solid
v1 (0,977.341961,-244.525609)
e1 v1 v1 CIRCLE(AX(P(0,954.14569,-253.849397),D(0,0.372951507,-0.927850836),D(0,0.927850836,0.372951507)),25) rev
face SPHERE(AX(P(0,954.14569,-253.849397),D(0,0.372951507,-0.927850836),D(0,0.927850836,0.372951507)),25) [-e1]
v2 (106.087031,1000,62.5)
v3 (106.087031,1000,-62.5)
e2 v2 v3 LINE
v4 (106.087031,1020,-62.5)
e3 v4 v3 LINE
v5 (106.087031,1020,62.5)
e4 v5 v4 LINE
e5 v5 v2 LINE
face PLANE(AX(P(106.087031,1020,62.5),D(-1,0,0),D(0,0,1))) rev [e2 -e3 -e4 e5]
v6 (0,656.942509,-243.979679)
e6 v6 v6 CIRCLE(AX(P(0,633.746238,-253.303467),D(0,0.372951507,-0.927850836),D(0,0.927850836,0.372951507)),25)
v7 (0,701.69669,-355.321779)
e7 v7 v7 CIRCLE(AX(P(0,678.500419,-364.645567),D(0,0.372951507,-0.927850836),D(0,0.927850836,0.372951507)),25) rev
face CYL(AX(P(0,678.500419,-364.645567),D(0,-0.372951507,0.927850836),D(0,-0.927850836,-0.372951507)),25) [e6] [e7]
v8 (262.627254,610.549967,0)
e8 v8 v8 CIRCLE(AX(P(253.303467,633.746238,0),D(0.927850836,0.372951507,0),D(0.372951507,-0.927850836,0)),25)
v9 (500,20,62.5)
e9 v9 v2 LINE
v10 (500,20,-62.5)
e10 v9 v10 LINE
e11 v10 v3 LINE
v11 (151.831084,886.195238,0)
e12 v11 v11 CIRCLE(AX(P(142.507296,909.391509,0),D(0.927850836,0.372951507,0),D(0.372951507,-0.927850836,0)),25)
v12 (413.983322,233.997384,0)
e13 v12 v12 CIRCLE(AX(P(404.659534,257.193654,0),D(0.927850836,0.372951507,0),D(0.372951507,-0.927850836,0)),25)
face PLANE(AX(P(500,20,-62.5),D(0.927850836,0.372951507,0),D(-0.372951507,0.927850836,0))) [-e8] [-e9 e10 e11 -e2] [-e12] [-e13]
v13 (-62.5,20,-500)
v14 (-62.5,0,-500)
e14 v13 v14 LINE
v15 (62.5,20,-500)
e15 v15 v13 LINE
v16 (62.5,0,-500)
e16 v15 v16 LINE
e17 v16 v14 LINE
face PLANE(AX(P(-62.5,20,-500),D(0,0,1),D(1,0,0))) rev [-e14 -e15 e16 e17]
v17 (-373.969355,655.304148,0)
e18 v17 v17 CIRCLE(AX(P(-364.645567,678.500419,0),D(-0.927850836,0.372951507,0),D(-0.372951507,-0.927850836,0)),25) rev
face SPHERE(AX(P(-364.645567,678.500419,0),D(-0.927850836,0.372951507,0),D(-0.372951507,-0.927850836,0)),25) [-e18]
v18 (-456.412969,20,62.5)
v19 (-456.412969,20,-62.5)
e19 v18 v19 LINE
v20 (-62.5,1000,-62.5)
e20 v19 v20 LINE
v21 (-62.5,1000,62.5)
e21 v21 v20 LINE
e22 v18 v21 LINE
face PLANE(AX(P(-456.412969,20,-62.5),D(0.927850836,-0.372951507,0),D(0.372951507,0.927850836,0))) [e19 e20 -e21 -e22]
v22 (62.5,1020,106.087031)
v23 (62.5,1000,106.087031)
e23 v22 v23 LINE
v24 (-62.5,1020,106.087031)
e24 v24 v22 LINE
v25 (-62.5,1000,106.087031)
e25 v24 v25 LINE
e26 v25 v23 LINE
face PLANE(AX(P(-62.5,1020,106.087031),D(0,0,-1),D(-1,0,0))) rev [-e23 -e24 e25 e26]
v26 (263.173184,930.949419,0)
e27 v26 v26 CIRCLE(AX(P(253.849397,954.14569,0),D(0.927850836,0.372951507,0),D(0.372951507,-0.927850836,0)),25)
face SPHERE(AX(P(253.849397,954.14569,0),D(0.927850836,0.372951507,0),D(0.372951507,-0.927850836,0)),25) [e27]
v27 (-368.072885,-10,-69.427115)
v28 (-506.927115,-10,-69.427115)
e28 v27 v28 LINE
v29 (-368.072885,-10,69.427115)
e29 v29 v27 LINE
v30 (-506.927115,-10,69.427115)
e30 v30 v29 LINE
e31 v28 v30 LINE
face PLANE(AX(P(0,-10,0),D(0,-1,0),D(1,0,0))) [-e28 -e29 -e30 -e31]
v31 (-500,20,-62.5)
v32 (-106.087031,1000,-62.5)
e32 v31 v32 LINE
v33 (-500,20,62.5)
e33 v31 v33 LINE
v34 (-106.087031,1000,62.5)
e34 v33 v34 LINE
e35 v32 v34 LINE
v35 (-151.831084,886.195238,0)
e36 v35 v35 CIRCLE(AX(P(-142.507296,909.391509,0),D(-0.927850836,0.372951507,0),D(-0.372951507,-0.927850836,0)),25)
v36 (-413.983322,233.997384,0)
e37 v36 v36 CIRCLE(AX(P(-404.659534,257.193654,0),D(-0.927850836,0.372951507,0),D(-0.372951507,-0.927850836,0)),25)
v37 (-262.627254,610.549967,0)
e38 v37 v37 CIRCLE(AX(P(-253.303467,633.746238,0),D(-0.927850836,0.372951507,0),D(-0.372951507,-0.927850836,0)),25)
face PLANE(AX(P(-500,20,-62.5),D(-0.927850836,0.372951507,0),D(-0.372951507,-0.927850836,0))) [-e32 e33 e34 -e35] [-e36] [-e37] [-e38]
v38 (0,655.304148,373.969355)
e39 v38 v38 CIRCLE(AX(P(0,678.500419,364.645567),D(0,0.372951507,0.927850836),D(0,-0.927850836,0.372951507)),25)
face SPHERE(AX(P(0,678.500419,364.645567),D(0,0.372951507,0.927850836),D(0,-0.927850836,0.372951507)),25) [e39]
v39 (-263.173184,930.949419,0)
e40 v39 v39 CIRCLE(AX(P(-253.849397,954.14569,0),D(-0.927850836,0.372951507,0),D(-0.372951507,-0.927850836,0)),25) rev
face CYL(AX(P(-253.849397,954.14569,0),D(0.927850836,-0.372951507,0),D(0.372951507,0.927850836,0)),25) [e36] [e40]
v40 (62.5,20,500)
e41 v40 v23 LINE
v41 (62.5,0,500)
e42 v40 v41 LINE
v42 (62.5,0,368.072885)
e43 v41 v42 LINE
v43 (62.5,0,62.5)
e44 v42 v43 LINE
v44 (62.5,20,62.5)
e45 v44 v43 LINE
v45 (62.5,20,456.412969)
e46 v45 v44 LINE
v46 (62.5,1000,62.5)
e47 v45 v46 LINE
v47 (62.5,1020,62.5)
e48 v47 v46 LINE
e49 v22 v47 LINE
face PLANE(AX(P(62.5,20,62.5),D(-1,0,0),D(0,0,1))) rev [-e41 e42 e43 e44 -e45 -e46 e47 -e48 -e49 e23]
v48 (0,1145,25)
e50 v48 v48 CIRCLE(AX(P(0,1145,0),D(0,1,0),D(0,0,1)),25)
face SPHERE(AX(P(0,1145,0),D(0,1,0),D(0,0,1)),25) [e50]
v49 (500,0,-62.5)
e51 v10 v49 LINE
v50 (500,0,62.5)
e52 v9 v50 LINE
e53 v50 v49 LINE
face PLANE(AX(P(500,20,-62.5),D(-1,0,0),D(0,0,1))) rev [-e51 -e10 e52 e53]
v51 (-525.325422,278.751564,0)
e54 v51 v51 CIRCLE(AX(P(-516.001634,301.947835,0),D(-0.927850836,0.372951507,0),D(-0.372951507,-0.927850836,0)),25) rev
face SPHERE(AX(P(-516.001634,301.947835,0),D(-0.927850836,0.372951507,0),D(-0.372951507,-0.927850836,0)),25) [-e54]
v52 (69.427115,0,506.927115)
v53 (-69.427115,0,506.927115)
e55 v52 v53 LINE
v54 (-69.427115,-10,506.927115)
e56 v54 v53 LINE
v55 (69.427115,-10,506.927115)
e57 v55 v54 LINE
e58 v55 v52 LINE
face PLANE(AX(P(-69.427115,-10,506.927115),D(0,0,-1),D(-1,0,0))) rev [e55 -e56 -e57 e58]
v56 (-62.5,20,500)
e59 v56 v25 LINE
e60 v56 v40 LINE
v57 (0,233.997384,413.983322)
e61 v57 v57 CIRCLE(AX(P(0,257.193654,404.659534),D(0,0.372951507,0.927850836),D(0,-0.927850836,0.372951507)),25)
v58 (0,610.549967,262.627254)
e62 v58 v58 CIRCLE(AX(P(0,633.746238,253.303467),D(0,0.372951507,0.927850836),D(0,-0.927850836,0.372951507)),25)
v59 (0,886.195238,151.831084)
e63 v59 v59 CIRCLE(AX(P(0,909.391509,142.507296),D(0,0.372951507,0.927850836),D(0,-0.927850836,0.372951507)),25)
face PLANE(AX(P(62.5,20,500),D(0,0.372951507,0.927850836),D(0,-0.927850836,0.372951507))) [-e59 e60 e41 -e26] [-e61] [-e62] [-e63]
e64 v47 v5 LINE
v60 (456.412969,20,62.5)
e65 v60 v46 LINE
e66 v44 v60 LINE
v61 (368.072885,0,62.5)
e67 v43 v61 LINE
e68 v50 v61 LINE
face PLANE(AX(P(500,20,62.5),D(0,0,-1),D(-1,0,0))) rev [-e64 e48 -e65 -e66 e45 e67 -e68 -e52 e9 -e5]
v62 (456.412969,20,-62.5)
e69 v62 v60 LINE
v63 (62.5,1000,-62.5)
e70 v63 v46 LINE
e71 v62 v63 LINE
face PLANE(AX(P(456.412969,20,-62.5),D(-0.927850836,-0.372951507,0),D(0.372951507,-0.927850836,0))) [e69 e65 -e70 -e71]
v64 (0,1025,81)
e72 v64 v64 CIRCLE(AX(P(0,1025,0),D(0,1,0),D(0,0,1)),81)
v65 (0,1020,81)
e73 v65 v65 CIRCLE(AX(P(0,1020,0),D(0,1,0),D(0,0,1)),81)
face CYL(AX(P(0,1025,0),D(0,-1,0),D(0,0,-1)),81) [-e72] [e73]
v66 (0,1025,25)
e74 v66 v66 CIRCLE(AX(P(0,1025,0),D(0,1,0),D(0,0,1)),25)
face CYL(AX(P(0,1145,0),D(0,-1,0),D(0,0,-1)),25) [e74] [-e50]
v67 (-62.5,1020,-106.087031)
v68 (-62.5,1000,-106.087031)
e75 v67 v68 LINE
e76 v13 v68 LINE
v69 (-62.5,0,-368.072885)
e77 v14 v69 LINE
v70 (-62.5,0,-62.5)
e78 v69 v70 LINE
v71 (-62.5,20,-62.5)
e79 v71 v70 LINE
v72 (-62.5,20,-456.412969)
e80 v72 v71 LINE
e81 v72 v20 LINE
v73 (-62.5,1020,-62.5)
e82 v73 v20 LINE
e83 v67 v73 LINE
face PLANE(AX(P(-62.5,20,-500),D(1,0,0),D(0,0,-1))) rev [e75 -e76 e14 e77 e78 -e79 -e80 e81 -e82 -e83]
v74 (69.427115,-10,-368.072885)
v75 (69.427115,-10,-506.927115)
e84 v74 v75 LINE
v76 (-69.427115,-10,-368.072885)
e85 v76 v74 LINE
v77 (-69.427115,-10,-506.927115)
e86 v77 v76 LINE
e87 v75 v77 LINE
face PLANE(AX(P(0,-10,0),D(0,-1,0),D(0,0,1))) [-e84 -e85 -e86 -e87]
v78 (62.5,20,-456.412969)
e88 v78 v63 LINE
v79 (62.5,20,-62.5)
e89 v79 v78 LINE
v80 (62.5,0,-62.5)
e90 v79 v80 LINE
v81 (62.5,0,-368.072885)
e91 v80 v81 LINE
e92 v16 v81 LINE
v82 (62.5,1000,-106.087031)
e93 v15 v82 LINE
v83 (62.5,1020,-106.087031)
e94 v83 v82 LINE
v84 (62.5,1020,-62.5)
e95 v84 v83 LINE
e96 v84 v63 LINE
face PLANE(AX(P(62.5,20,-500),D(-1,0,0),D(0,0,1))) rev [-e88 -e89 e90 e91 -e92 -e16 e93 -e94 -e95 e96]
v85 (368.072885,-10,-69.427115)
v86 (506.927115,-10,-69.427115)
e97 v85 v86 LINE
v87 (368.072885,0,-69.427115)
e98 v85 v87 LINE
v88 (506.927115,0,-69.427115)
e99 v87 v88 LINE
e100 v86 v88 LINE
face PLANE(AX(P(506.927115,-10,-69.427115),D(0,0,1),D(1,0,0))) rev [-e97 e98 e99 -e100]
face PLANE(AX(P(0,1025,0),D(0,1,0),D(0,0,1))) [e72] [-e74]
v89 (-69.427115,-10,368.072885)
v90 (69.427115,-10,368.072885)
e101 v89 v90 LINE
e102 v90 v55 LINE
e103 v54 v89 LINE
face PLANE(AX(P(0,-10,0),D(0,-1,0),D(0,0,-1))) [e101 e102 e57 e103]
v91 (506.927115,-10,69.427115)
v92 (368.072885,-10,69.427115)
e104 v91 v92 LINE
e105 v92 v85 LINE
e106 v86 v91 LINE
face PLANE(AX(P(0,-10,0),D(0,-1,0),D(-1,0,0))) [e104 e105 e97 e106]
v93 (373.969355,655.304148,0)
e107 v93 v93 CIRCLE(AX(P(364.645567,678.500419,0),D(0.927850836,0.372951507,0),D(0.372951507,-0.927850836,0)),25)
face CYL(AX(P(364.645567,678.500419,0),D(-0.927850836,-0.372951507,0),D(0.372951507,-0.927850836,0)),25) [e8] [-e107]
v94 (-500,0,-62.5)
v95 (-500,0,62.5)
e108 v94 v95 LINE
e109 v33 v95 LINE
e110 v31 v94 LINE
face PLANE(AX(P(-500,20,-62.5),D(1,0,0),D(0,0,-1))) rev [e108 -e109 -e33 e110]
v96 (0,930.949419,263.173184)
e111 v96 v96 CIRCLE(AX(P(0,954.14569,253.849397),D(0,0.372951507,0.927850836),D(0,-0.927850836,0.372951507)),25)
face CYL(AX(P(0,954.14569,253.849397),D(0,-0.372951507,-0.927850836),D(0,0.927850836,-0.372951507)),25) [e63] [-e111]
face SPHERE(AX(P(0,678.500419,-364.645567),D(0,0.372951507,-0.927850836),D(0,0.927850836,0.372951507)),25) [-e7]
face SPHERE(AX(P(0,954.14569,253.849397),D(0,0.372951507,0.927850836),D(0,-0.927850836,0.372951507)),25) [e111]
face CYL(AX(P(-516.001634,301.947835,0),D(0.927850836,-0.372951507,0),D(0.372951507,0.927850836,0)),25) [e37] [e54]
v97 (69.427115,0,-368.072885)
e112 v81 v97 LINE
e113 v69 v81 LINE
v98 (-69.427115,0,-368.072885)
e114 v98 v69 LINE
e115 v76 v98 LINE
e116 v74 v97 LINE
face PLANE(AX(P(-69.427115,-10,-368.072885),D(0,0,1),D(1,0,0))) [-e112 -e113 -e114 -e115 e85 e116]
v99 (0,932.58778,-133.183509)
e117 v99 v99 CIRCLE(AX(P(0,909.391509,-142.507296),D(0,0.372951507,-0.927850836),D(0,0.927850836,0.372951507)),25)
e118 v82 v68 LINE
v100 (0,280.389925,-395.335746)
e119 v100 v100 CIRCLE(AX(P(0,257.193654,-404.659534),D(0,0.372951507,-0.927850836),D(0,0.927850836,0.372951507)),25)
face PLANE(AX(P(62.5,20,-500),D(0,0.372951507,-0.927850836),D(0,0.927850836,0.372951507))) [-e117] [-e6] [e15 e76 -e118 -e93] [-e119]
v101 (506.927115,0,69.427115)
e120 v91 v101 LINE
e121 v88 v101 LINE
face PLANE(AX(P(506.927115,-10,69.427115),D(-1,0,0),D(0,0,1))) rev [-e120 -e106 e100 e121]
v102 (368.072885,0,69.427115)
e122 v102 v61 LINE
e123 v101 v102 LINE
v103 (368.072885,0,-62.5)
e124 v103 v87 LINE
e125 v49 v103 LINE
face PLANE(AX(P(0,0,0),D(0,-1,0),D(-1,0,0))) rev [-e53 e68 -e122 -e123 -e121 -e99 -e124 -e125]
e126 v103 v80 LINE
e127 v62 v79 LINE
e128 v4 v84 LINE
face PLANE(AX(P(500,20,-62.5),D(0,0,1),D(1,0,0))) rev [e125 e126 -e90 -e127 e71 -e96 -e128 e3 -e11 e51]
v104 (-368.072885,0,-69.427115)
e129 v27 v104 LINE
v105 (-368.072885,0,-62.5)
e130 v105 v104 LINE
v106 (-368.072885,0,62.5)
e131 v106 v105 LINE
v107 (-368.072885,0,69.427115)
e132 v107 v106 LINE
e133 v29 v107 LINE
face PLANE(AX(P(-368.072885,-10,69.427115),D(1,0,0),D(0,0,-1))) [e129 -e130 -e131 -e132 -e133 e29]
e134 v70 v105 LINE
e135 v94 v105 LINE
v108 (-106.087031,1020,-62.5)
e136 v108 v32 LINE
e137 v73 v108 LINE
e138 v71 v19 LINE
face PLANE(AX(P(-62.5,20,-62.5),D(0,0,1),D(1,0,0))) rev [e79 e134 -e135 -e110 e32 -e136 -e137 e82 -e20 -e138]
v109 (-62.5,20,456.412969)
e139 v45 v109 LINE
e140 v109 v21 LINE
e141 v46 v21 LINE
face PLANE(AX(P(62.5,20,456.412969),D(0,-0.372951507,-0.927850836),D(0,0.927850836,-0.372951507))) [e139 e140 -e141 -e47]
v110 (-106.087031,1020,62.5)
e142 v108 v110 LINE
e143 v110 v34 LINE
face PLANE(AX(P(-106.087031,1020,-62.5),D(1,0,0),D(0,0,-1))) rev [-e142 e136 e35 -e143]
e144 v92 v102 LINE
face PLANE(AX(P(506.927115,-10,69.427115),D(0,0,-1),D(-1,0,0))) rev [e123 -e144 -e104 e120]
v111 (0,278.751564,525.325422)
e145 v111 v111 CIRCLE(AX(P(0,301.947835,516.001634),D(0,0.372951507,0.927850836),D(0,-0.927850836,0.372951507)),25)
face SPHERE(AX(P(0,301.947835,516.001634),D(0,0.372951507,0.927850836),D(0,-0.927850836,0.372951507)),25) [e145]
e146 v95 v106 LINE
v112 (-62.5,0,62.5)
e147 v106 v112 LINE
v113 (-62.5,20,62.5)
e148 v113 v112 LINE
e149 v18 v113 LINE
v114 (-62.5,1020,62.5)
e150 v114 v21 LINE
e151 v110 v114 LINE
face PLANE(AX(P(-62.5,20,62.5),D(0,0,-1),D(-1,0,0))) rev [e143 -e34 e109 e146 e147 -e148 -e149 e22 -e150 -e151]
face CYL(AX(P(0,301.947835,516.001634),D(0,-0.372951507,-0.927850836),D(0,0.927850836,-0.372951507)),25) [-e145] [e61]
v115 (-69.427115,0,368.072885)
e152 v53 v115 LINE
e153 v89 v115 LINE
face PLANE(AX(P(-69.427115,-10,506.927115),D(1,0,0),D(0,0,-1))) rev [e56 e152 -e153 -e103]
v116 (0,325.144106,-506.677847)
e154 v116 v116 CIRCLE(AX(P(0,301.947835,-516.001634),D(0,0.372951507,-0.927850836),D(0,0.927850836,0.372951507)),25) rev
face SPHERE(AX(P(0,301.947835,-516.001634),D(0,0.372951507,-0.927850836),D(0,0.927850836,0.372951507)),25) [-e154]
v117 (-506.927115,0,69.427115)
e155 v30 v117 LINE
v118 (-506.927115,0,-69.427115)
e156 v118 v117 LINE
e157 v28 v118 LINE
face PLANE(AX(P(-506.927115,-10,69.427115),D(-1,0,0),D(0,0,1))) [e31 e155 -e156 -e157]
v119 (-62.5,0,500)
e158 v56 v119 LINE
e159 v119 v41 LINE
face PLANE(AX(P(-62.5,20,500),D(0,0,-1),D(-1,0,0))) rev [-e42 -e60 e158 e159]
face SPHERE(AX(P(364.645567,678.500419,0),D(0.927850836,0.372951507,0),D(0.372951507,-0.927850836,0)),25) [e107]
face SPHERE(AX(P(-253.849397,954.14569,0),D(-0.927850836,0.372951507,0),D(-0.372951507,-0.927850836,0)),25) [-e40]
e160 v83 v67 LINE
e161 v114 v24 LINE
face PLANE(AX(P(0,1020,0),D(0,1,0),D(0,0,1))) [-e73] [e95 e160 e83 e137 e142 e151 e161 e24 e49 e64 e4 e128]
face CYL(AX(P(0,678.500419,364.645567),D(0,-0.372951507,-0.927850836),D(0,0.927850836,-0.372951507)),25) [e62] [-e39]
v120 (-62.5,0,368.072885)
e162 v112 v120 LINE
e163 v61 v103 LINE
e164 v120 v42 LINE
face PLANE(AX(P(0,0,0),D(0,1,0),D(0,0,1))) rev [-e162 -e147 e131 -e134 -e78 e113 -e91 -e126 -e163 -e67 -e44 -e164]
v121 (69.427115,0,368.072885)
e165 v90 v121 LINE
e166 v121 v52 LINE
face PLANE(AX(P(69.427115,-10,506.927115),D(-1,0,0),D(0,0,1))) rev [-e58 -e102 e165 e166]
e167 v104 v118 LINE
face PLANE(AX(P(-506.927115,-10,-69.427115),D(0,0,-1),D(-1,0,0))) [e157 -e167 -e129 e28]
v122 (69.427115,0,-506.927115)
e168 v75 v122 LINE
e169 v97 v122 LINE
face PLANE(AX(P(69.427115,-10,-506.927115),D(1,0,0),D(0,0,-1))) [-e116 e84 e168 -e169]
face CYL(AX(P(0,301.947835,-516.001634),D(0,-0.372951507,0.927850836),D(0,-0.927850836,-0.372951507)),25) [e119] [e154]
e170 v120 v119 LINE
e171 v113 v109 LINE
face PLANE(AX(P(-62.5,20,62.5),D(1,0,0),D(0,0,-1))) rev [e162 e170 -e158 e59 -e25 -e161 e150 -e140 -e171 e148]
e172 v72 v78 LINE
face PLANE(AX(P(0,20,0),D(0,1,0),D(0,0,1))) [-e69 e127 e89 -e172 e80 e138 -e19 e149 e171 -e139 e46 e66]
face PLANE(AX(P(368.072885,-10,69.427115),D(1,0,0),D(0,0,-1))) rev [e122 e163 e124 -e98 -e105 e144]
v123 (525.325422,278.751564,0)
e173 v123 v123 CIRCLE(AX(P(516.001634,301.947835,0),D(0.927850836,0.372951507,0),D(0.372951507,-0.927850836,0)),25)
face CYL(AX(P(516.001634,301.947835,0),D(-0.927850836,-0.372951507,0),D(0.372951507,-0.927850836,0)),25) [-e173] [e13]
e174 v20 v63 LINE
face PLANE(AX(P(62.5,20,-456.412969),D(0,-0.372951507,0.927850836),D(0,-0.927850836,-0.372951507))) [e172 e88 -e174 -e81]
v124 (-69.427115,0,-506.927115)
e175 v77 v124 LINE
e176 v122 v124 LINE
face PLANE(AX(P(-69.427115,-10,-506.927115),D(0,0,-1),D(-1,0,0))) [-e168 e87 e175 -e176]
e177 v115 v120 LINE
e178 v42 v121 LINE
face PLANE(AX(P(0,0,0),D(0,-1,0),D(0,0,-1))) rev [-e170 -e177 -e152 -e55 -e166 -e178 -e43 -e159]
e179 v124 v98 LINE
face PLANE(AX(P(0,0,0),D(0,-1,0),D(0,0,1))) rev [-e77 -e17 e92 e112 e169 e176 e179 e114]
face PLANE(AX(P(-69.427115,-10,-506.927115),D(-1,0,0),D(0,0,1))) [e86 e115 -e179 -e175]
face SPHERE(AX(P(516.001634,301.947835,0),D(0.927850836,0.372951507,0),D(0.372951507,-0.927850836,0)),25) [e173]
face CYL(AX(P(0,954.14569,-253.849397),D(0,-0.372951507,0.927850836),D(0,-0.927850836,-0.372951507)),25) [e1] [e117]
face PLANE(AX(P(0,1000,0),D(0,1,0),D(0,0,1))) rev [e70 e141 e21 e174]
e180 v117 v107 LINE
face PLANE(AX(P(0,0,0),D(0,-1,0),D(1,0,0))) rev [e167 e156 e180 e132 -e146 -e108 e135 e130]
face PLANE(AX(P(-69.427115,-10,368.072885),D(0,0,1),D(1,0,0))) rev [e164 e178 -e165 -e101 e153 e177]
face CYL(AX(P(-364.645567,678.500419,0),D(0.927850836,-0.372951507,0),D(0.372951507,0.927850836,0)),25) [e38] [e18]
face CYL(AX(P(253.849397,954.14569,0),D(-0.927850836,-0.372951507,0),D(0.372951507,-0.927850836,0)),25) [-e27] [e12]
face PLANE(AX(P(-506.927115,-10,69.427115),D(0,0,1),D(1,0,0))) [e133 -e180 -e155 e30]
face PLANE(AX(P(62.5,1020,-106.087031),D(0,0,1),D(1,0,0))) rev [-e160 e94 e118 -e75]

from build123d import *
from build123d.topology import SkipClean

# Parameters (mm, degrees)
BOSS_EXTRUDE1_DEPTH     = 20
BOSS_EXTRUDE2_DEPTH     = 20
SKETCH4_W               = 43.587031298
SKETCH4_H               = 125
MIRROR3_COPY_1_SKETCH_W = 43.587031298
MIRROR3_COPY_1_SKETCH_H = 125
MIRROR3_COPY_2_SKETCH_W = 43.587031298
MIRROR3_COPY_2_SKETCH_H = 125
SKETCH8_R               = 25
BOSS_EXTRUDE3_DEPTH     = 120
SKETCH11_W              = 138.854230546
SKETCH11_H              = 138.854230546
BOSS_EXTRUDE4_DEPTH     = 10
SKETCH12_R              = 81
BOSS_EXTRUDE5_DEPTH     = 5
SKETCH13_R              = 25
BOSS_EXTRUDE6_DEPTH     = 120
MIRROR6_COPY_1_SKETCH_R = 25
MIRROR6_COPY_1_DEPTH    = 120
MIRROR6_COPY_4_SKETCH_W = 138.854230546
MIRROR6_COPY_4_SKETCH_H = 138.854230546
MIRROR6_COPY_4_DEPTH    = 10
MIRROR6_COPY_6_SKETCH_R = 25
MIRROR6_COPY_6_DEPTH    = 120
MIRROR6_COPY_9_SKETCH_W = 138.854230546
MIRROR6_COPY_9_SKETCH_H = 138.854230546
MIRROR6_COPY_9_DEPTH    = 10


with BuildPart() as part:
    # Sketch1 → Boss-Extrude1 (new body)
    with BuildSketch(Plane(origin=(0, 0, 0), x_dir=(1, 0, 0), z_dir=(0, 1, 0))):
        Polygon((500, 62.5), (62.5, 62.5), (62.5, 500), (-62.5, 500), (-62.5, 62.5), (-500, 62.5), (-500, -62.5), (-62.5, -62.5), (-62.5, -500), (62.5, -500), (62.5, -62.5), (500, -62.5), align=None)
    extrude(amount=BOSS_EXTRUDE1_DEPTH)



with BuildPart() as body_2:
    # Sketch2 → Boss-Extrude2 (new body)
    with BuildSketch(Plane(origin=(0, 1000, 0), x_dir=(1, 0, 0), z_dir=(0, 1, 0))):
        Polygon((-62.5, 106.087031298), (-62.5, 62.5), (-106.087031298, 62.5), (-106.087031298, -62.5), (-62.5, -62.5), (-62.5, -106.087031298), (62.5, -106.087031298), (62.5, -62.5), (106.087031298, -62.5), (106.087031298, 62.5), (62.5, 62.5), (62.5, 106.087031298), align=None)
    extrude(amount=BOSS_EXTRUDE2_DEPTH)


with BuildPart() as part_1:
    add(part.part)

    add(body_2.part)  # Sweep1 merges body 2
    # Sweep1: sweep along a path in Sketch5
    with BuildLine(Plane.XY) as sweep1_path:
        Line((-478.206484351, 20), (-84.293515649, 1000))
    # Sketch4 → Sweep1 (sweep)
    with BuildSketch(Plane(origin=(0, 1000, 0), x_dir=(1, 0, 0), z_dir=(0, 1, 0))):
        with Locations((-84.293515649, 0)):
            Rectangle(SKETCH4_W, SKETCH4_H)
    sweep1 = sweep(path=sweep1_path.line)

    # Mirror1: Sweep1 across plane
    add(sweep1.mirror(Plane(origin=(0, 0, 0), x_dir=(0, 0, 1), z_dir=(1, 0, 0))))

    # Mirror2: Sweep1 across plane
    add(sweep1.mirror(Plane(origin=(0, 0, 0), x_dir=(-0.7071067811865477, 0, 0.7071067811865474), z_dir=(-0.7071067811865476, 0, -0.7071067811865476))))

    # Mirror3 copy 1: sweep along a path in Mirror3 copy 1 path
    with BuildLine(Plane.ZY) as mirror3_copy_1_path:
        Line((-478.206484351, 20), (-84.293515649, 1000))
    # Mirror3 copy 1 sketch → Mirror3 copy 1 (sweep)
    with BuildSketch(Plane.ZX.offset(1000)):
        with Locations((-84.293515649, 0)):
            Rectangle(MIRROR3_COPY_1_SKETCH_W, MIRROR3_COPY_1_SKETCH_H)
    sweep(path=mirror3_copy_1_path.line)

    # Mirror3 copy 2: sweep along a path in Mirror3 copy 2 path
    with BuildLine(Plane(origin=(0, 0, 0), x_dir=(1, 0, 0), z_dir=(0, 0, -1))) as mirror3_copy_2_path:
        Line((-478.206484351, -20), (-84.293515649, -1000))
    # Mirror3 copy 2 sketch → Mirror3 copy 2 (sweep)
    with BuildSketch(Plane(origin=(0, 1000, 0), x_dir=(1, 0, 0), z_dir=(0, 1, 0))):
        with Locations((-84.293515649, 0)):
            Rectangle(MIRROR3_COPY_2_SKETCH_W, MIRROR3_COPY_2_SKETCH_H)
    sweep(path=mirror3_copy_2_path.line)

    # Sketch8 → Boss-Extrude3 (add)
    with BuildSketch(Plane(origin=(0, 175.803540397, 437.374453947), x_dir=(1, 0, 0), z_dir=(0, 0.3729515073235979, 0.9278508356331078))):
        with Locations((0, 493.552067167)):
            Circle(SKETCH8_R)
        with Locations((0, 87.718964011)):
            Circle(SKETCH8_R)
        with Locations((0, 790.631360439)):
            Circle(SKETCH8_R)
    boss_extrude3 = extrude(amount=BOSS_EXTRUDE3_DEPTH)

    # Sketch9 → Revolve1 (revolve)
    with BuildSketch(Plane(origin=(0, 220.557721276, 548.716554223), x_dir=(1, 0, 0), z_dir=(0, 0.372951507323598, 0.9278508356331078))):
        with BuildLine():
            Line((-25, 493.552067167), (25, 493.552067167))
            ThreePointArc((25, 493.552067167), (0, 518.552067167), (-25, 493.552067167))
        make_face()
    revolve1 = revolve(axis=Axis((-25, 678.500419225, 364.64556683), (1, 0, 0)))

    # Sketch10 → Revolve2 (revolve)
    with BuildSketch(Plane(origin=(0, 220.557721276, 548.716554223), x_dir=(1, 0, 0), z_dir=(0, 0.372951507323598, 0.9278508356331078))):
        with BuildLine():
            Line((-25, 87.718964011), (25, 87.718964011))
            ThreePointArc((25, 87.718964011), (0, 112.718964011), (-25, 87.718964011))
        make_face()
    revolve2 = revolve(axis=Axis((-25, 301.947835334, 516.001634374), (1, 0, 0)))

    # Sketch11 → Boss-Extrude4 (add)
    with BuildSketch(Plane.XZ):
        with Locations((0, 437.5)):
            Rectangle(SKETCH11_W, SKETCH11_H)
    boss_extrude4 = extrude(amount=BOSS_EXTRUDE4_DEPTH)

    # Sketch12 → Boss-Extrude5 (add)
    with BuildSketch(Plane(origin=(0, 1020, 0), x_dir=(1, 0, 0), z_dir=(0, 1, 0))):
        Circle(SKETCH12_R)
    extrude(amount=BOSS_EXTRUDE5_DEPTH)

    # Sketch13 → Boss-Extrude6 (add)
    with BuildSketch(Plane(origin=(0, 1025, 0), x_dir=(1, 0, 0), z_dir=(0, 1, 0))):
        Circle(SKETCH13_R)
    extrude(amount=BOSS_EXTRUDE6_DEPTH)

    # Sketch14 → Revolve3 (revolve)
    with SkipClean():  # the faces are left unmerged after this step: merging them gives an invalid solid
        with BuildSketch(Plane(origin=(0, 1145, 0), x_dir=(1, 0, 0), z_dir=(0, 1, 0))):
            with BuildLine():
                Line((-25, 0), (25, 0))
                ThreePointArc((25, 0), (0, 25), (-25, 0))
            make_face()
        revolve(axis=Axis((-25, 1145, 0), (1, 0, 0)))
    add(part_1.part.scale(1), mode=Mode.REPLACE)  # the faces are merged on a copy

    # Sketch15 → Revolve4 (revolve)
    with BuildSketch(Plane(origin=(0, 220.557721276, 548.716554223), x_dir=(1, 0, 0), z_dir=(0, 0.3729515073235979, 0.9278508356331077))):
        with BuildLine():
            Line((-25, 790.631360439), (25, 790.631360439))
            ThreePointArc((25, 790.631360439), (0, 815.631360439), (-25, 790.631360439))
        make_face()
    revolve4 = revolve(axis=Axis((-25, 954.145689736, 253.84939661), (1, 0, 0)))

    # Mirror4: Boss-Extrude3, Revolve1, Revolve2, Boss-Extrude4, Revolve4 across plane
    add(boss_extrude3.mirror(Plane.XY))
    add(revolve1.mirror(Plane.XY))
    add(revolve2.mirror(Plane.XY))
    add(boss_extrude4.mirror(Plane.XY))
    add(revolve4.mirror(Plane.XY))

    # Mirror5: Boss-Extrude3, Revolve1, Revolve2, Boss-Extrude4, Revolve4 across plane
    add(boss_extrude3.mirror(Plane(origin=(0, 0, 0), x_dir=(-0.7071067811865477, 0, 0.7071067811865474), z_dir=(-0.7071067811865476, 0, -0.7071067811865476))))
    add(revolve1.mirror(Plane(origin=(0, 0, 0), x_dir=(-0.7071067811865477, 0, 0.7071067811865474), z_dir=(-0.7071067811865476, 0, -0.7071067811865476))))
    add(revolve2.mirror(Plane(origin=(0, 0, 0), x_dir=(-0.7071067811865477, 0, 0.7071067811865474), z_dir=(-0.7071067811865476, 0, -0.7071067811865476))))
    add(boss_extrude4.mirror(Plane(origin=(0, 0, 0), x_dir=(-0.7071067811865477, 0, 0.7071067811865474), z_dir=(-0.7071067811865476, 0, -0.7071067811865476))))
    add(revolve4.mirror(Plane(origin=(0, 0, 0), x_dir=(-0.7071067811865477, 0, 0.7071067811865474), z_dir=(-0.7071067811865476, 0, -0.7071067811865476))))

    # Mirror6 copy 1 sketch → Mirror6 copy 1 (add)
    with BuildSketch(Plane(origin=(437.374453947, 175.803540397, 0), x_dir=(0, 0, -1), z_dir=(0.927850835633108, 0.3729515073235979, 0))):
        with Locations((0, 493.552067167)):
            Circle(MIRROR6_COPY_1_SKETCH_R)
        with Locations((0, 87.718964011)):
            Circle(MIRROR6_COPY_1_SKETCH_R)
        with Locations((0, 790.631360439)):
            Circle(MIRROR6_COPY_1_SKETCH_R)
    extrude(amount=MIRROR6_COPY_1_DEPTH)

    # Mirror6 copy 2 sketch → Mirror6 copy 2 (revolve)
    with BuildSketch(Plane(origin=(548.716554223, 220.557721276, 0), x_dir=(0, 0, -1), z_dir=(0.927850835633108, 0.372951507323598, 0))):
        with BuildLine():
            Line((-25, 493.552067167), (25, 493.552067167))
            ThreePointArc((25, 493.552067167), (0, 518.552067167), (-25, 493.552067167))
        make_face()
    revolve(axis=Axis((364.64556683, 678.500419225, 25), (0, 0, -1)))

    # Mirror6 copy 3 sketch → Mirror6 copy 3 (revolve)
    with BuildSketch(Plane(origin=(548.716554223, 220.557721276, 0), x_dir=(0, 0, -1), z_dir=(0.927850835633108, 0.372951507323598, 0))):
        with BuildLine():
            Line((-25, 87.718964011), (25, 87.718964011))
            ThreePointArc((25, 87.718964011), (0, 112.718964011), (-25, 87.718964011))
        make_face()
    revolve(axis=Axis((516.001634374, 301.947835334, 25), (0, 0, -1)))

    # Mirror6 copy 4 sketch → Mirror6 copy 4 (add)
    with BuildSketch(Plane(origin=(0, 0, 0), x_dir=(0, 0, -1), z_dir=(0, -1, 0))):
        with Locations((0, 437.5)):
            Rectangle(MIRROR6_COPY_4_SKETCH_W, MIRROR6_COPY_4_SKETCH_H)
    extrude(amount=MIRROR6_COPY_4_DEPTH)

    # Mirror6 copy 5 sketch → Mirror6 copy 5 (revolve)
    with BuildSketch(Plane(origin=(548.716554223, 220.557721276, 0), x_dir=(0, 0, -1), z_dir=(0.9278508356331079, 0.3729515073235979, 0))):
        with BuildLine():
            Line((-25, 790.631360439), (25, 790.631360439))
            ThreePointArc((25, 790.631360439), (0, 815.631360439), (-25, 790.631360439))
        make_face()
    revolve(axis=Axis((253.84939661, 954.145689736, 25), (0, 0, -1)))

    # Mirror6 copy 6 sketch → Mirror6 copy 6 (add)
    with BuildSketch(Plane(origin=(0, 175.803540397, 437.374453947), x_dir=(-1, 0, 0), z_dir=(0, 0.3729515073235979, 0.9278508356331078))):
        with Locations((0, -493.552067167)):
            Circle(MIRROR6_COPY_6_SKETCH_R)
        with Locations((0, -87.718964011)):
            Circle(MIRROR6_COPY_6_SKETCH_R)
        with Locations((0, -790.631360439)):
            Circle(MIRROR6_COPY_6_SKETCH_R)
    extrude(amount=MIRROR6_COPY_6_DEPTH)

    # Mirror6 copy 7 sketch → Mirror6 copy 7 (revolve)
    with BuildSketch(Plane(origin=(0, 220.557721276, 548.716554223), x_dir=(-1, 0, 0), z_dir=(0, 0.372951507323598, 0.9278508356331078))):
        with BuildLine():
            Line((-25, -493.552067167), (25, -493.552067167))
            ThreePointArc((25, -493.552067167), (0, -518.552067167), (-25, -493.552067167))
        make_face()
    revolve(axis=Axis((25, 678.500419225, 364.64556683), (1, 0, 0)))

    # Mirror6 copy 8 sketch → Mirror6 copy 8 (revolve)
    with BuildSketch(Plane(origin=(0, 220.557721276, 548.716554223), x_dir=(-1, 0, 0), z_dir=(0, 0.372951507323598, 0.9278508356331078))):
        with BuildLine():
            Line((-25, -87.718964011), (25, -87.718964011))
            ThreePointArc((25, -87.718964011), (0, -112.718964011), (-25, -87.718964011))
        make_face()
    revolve(axis=Axis((25, 301.947835334, 516.001634374), (1, 0, 0)))

    # Mirror6 copy 9 sketch → Mirror6 copy 9 (add)
    with BuildSketch(Plane(origin=(0, 0, 0), x_dir=(-1, 0, 0), z_dir=(0, -1, 0))):
        with Locations((0, -437.5)):
            Rectangle(MIRROR6_COPY_9_SKETCH_W, MIRROR6_COPY_9_SKETCH_H)
    extrude(amount=MIRROR6_COPY_9_DEPTH)

    # Mirror6 copy 10 sketch → Mirror6 copy 10 (revolve)
    with BuildSketch(Plane(origin=(0, 220.557721276, 548.716554223), x_dir=(-1, 0, 0), z_dir=(0, 0.3729515073235979, 0.9278508356331077))):
        with BuildLine():
            Line((-25, -790.631360439), (25, -790.631360439))
            ThreePointArc((25, -790.631360439), (0, -815.631360439), (-25, -790.631360439))
        make_face()
    revolve(axis=Axis((25, 954.145689736, 253.84939661), (1, 0, 0)))


solid = part_1.part
